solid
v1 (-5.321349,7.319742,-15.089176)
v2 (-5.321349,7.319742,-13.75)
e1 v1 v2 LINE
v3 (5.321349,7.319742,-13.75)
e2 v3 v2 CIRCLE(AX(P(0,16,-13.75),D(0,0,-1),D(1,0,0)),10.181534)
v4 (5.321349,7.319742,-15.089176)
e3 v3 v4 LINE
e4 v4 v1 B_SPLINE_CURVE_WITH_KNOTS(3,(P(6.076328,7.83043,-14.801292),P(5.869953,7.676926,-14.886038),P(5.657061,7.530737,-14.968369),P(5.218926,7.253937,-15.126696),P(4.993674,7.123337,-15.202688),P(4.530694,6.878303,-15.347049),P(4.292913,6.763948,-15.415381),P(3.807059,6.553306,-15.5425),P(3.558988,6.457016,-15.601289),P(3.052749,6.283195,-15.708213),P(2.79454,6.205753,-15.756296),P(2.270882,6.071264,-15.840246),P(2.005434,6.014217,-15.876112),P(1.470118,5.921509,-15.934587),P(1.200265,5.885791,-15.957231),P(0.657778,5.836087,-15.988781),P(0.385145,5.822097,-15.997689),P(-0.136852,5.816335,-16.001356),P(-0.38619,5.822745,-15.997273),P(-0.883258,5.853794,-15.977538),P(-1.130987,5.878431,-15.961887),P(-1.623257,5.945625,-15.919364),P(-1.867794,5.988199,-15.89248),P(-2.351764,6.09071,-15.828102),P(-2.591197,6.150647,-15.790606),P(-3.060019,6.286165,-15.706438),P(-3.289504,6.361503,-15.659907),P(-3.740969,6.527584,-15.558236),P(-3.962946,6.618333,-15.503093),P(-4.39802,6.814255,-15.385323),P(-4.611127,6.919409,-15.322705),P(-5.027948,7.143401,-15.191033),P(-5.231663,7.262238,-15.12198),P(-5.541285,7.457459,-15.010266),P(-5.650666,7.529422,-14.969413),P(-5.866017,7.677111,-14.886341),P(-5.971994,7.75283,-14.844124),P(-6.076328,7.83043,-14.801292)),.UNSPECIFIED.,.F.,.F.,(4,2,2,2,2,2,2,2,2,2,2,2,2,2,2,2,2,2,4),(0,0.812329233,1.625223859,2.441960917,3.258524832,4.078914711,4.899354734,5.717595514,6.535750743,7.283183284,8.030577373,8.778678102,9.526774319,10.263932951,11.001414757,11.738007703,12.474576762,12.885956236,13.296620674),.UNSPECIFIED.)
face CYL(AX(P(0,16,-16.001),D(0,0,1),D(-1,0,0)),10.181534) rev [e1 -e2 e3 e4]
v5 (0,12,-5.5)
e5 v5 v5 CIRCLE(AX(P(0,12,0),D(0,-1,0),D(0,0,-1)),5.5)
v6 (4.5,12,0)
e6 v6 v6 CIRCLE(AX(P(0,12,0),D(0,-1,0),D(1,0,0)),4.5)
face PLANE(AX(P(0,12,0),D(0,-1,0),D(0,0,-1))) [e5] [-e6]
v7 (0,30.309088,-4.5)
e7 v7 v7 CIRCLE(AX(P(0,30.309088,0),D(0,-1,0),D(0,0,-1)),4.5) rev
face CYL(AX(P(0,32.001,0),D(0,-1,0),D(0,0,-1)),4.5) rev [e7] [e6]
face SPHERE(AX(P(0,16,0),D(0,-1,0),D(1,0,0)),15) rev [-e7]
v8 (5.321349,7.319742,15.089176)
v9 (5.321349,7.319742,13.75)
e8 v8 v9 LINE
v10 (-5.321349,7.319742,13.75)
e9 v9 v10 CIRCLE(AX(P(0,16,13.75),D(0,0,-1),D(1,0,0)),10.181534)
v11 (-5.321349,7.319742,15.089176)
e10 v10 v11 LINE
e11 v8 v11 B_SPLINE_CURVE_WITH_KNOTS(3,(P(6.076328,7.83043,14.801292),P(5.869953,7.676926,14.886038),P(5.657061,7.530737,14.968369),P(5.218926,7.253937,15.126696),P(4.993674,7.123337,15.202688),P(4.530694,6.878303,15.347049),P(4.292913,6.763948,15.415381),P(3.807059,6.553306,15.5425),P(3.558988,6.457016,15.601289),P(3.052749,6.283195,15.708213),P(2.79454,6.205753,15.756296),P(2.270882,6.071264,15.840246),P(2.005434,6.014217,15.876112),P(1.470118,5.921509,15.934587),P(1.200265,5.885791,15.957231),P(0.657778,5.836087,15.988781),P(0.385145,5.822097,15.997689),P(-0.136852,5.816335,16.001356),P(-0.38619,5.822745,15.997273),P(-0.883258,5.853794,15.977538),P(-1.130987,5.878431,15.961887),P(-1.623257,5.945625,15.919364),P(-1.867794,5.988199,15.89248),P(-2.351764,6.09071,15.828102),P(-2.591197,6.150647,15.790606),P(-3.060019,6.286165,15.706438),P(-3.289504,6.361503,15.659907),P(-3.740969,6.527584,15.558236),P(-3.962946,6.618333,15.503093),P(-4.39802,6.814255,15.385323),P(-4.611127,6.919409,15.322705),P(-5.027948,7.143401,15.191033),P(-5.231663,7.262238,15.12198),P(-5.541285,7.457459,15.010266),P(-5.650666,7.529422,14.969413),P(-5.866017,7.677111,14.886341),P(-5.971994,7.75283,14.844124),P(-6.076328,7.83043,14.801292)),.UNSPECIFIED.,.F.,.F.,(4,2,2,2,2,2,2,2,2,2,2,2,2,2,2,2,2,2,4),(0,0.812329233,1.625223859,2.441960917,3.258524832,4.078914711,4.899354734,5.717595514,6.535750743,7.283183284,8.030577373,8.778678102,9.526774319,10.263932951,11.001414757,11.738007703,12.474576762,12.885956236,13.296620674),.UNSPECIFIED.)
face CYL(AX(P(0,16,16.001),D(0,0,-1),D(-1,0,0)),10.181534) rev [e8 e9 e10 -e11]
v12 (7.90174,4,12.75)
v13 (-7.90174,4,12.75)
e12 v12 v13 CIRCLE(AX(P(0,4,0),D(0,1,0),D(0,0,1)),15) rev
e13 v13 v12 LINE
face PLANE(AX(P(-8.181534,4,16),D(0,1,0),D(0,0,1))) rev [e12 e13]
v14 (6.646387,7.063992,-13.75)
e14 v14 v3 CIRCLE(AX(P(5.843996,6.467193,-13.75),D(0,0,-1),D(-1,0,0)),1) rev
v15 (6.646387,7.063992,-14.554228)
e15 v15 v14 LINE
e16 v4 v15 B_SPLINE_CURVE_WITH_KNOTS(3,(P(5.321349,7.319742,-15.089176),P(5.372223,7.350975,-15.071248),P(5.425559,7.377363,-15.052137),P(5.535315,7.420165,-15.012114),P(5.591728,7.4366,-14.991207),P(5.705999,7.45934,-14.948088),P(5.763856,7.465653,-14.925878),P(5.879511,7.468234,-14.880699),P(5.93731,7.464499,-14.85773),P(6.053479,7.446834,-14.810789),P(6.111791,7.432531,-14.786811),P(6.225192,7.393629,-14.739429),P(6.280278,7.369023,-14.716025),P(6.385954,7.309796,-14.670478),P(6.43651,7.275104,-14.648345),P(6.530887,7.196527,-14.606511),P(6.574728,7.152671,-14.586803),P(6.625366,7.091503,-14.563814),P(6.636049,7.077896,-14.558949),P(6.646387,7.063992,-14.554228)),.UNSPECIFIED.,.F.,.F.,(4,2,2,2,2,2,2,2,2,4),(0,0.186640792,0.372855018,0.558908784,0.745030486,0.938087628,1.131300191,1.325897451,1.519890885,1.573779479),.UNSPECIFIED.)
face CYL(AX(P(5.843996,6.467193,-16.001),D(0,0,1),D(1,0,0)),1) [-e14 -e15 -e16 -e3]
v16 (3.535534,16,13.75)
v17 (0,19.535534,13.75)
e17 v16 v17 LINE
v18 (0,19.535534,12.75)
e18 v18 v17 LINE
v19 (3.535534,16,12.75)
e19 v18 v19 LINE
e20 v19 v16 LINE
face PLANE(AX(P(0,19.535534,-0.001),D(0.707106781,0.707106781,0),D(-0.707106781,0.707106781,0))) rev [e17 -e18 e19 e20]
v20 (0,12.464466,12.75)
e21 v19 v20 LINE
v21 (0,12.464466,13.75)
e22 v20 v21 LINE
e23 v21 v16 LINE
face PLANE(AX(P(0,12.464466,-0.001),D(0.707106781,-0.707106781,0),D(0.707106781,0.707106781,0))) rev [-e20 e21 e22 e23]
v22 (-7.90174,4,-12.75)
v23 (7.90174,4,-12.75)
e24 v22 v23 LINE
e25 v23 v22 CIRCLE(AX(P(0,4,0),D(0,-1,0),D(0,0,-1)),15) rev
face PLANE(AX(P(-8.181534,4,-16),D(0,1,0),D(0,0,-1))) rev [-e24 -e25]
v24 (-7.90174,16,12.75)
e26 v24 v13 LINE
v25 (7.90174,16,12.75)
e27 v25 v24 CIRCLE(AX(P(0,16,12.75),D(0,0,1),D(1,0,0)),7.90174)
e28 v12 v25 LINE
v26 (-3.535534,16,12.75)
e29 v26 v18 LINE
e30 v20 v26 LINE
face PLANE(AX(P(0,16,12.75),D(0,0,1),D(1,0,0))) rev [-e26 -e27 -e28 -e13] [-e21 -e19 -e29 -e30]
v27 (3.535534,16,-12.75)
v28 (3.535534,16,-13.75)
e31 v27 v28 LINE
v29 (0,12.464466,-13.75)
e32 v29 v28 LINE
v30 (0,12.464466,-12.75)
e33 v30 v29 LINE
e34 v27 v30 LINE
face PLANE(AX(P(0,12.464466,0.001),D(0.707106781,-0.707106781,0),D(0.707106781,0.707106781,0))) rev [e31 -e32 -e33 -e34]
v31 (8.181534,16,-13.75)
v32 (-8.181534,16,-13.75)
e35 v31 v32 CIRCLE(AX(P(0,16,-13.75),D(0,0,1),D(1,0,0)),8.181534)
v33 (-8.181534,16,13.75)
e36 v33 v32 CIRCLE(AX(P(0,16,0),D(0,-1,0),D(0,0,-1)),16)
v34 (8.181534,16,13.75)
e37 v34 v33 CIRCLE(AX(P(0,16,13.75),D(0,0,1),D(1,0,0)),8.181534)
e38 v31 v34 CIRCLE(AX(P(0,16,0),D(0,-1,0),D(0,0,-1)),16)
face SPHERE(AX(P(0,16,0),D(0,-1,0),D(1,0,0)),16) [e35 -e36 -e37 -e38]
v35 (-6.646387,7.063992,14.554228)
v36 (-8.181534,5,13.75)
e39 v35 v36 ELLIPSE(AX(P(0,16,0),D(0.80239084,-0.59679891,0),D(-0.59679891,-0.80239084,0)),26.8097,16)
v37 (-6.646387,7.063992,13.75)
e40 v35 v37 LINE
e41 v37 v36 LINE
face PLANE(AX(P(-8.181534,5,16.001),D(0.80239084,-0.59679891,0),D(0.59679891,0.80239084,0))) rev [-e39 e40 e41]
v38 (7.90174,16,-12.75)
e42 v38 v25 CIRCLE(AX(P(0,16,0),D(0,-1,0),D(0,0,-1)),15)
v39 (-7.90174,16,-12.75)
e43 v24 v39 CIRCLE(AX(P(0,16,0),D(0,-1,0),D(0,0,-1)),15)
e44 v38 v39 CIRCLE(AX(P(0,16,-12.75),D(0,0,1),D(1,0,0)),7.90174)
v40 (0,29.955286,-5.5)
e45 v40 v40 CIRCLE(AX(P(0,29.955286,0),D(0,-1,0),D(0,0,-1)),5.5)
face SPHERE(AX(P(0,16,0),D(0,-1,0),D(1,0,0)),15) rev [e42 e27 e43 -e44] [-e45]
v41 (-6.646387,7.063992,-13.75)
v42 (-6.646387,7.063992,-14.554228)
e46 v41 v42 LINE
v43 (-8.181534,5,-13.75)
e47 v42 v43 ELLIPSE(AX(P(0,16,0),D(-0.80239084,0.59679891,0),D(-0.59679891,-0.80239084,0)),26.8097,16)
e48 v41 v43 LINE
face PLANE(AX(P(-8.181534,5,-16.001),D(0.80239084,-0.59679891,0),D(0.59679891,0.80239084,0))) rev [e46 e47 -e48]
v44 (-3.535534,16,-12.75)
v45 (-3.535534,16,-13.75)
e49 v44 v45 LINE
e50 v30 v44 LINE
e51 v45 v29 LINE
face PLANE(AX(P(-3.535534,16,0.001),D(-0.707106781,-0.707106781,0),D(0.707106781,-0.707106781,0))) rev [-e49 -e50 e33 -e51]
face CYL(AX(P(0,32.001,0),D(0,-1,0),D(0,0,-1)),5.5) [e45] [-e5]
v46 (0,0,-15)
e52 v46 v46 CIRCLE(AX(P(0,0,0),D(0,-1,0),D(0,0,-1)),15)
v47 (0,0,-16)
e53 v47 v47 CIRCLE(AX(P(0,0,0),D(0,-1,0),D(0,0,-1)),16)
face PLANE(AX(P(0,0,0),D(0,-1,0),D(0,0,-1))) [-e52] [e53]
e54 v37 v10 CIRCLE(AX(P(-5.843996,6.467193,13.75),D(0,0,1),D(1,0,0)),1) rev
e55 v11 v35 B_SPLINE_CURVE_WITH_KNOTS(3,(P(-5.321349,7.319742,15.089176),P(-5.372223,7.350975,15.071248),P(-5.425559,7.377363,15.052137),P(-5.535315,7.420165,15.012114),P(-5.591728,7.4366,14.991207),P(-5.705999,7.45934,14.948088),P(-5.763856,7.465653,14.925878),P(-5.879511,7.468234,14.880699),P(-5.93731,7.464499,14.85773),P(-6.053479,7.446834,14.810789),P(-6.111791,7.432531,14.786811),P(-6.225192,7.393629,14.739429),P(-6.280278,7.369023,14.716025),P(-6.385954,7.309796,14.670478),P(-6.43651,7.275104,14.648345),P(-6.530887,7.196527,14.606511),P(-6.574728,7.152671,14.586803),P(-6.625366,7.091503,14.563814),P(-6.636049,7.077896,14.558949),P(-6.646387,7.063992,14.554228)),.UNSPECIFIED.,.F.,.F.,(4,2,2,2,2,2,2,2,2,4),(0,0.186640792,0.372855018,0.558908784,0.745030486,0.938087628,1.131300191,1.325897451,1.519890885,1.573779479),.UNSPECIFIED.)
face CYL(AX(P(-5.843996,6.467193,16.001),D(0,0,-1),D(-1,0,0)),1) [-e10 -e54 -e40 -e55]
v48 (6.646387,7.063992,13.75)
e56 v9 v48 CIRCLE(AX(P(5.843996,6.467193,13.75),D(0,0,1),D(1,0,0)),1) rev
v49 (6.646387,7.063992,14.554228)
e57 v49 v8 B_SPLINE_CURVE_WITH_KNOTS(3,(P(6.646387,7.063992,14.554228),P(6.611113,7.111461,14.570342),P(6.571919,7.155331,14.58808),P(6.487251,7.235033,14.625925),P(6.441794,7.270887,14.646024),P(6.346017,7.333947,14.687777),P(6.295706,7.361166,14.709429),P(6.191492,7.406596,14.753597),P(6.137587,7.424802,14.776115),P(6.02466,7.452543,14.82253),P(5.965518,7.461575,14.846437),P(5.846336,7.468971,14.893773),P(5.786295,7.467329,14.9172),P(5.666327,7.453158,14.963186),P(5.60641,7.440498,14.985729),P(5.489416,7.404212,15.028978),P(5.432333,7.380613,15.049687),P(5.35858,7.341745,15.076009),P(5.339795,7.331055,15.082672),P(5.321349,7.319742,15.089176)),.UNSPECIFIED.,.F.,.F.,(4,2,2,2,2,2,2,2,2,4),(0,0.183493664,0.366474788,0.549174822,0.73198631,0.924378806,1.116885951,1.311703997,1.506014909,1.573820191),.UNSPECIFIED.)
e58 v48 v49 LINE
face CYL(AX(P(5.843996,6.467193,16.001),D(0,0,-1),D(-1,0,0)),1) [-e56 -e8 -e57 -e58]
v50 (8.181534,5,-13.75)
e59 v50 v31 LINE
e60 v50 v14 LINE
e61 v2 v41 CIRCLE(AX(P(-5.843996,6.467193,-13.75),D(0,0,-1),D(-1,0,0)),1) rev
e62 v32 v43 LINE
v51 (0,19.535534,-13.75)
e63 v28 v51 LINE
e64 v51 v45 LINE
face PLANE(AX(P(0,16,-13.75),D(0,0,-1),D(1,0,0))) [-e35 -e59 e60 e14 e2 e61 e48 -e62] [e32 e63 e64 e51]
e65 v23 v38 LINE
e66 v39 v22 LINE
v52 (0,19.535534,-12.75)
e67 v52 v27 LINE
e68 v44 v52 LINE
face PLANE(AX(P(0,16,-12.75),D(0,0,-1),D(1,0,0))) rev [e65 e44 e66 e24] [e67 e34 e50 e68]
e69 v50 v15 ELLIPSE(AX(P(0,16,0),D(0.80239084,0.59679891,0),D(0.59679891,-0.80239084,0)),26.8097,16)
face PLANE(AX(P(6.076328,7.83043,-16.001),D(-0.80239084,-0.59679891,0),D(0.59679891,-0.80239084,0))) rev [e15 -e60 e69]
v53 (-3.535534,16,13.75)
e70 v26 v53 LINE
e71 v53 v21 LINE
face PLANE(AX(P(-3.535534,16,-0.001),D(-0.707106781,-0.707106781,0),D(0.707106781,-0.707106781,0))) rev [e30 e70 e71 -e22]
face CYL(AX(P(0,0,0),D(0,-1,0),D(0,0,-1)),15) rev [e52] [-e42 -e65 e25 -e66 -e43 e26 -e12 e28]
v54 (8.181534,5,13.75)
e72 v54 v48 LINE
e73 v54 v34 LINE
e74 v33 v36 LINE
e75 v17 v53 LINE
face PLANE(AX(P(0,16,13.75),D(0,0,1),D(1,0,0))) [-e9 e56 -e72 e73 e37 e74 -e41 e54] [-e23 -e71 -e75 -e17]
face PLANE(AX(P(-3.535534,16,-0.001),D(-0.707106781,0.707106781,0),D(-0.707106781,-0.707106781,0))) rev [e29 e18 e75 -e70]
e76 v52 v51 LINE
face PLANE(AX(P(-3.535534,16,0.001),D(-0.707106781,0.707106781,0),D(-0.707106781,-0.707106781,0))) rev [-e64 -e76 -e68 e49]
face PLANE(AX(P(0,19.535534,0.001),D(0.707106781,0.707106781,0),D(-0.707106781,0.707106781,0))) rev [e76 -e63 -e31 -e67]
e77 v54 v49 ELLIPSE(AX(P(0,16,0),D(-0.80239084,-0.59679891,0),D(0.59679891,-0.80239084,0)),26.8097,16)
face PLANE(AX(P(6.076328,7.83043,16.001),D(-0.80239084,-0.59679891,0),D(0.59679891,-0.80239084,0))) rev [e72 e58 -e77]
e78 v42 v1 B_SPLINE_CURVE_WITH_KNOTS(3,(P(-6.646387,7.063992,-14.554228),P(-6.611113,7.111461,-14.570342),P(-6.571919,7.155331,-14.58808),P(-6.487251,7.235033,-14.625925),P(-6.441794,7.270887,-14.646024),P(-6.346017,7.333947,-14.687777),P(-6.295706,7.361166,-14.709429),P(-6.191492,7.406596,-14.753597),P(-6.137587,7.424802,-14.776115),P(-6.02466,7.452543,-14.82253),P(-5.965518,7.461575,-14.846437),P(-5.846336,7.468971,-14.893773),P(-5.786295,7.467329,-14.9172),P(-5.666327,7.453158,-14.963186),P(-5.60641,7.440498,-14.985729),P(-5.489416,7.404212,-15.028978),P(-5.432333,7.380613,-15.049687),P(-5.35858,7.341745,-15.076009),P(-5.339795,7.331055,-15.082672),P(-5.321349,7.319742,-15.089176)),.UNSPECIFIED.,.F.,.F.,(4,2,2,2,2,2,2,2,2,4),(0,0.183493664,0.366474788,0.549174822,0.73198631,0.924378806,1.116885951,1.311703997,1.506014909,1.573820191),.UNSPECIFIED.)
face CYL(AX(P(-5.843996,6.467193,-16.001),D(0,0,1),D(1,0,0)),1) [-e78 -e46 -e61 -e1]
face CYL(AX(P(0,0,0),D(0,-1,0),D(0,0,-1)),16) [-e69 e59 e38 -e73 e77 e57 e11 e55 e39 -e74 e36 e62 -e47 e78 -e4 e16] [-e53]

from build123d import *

# Parameters (mm, degrees)
REVOLVE1_ANGLE           = 180
CUT_EXTRUDE1_DEPTH       = 39.328351126
SHELL1_DEPTH             = 16
SHELL1_2_DEPTH           = 4
EXTRUDE1_REACH           = 40.328
EXTRUDE1_END_RADIUS      = 16
CUT_EXTRUDE2_REACH       = 40.328
EXTRUDE_THIN1_REACH      = 53.192
EXTRUDE_THIN1_END_RADIUS = 15
EXTRUDE_THIN1_START      = -12
SKETCH5_R                = 5.5
SKETCH5_R_2              = 4.5
FILLET_1_R               = 1


with BuildPart() as part:
    # Sketch1 → Revolve1 (revolve)
    with BuildSketch(Plane(origin=(0, 0, 0), x_dir=(-1, 0, 0), z_dir=(0, 0, -1))):
        with BuildLine():
            Line((0, 0), (16, 0))
            Line((16, 0), (16, 16))
            ThreePointArc((16, 16), (11.313708499, 27.313708499), (0, 32))
            Line((0, 32), (0, 0))
        make_face()
    revolve(axis=Axis((0, 0, 0), (0, 1, 0)), revolution_arc=REVOLVE1_ANGLE)

    # Sketch2 → Cut-Extrude1 (cut, through all)
    with BuildSketch(Plane.XY.offset(13.75)):
        with BuildLine():
            Line((8.181534086, 5), (8.181534086, 16))
            ThreePointArc((8.181534086, 16), (0, 24.181534086), (-8.181534086, 16))
            Line((-8.181534086, 16), (-8.181534086, 5))
            Line((-8.181534086, 5), (8.181534086, 5))
        make_face()
    extrude(amount=CUT_EXTRUDE1_DEPTH, mode=Mode.SUBTRACT)

    # Shell1: read off the stored shape, not the designer's step
    # Shell1 outline → Shell1 (cut)
    with BuildSketch(Plane(origin=(0, 0, 0), x_dir=(1, 0, 0), z_dir=(0, 1, 0))):
        with BuildLine():
            ThreePointArc((7.901740315, -12.75), (13.105840391, -7.296365372), (15, 0))
            Line((15, 0), (-15, 0))
            ThreePointArc((-15, 0), (-13.105840391, -7.296365372), (-7.901740315, -12.75))
            Line((-7.901740315, -12.75), (7.901740315, -12.75))
        make_face()
    extrude(amount=SHELL1_DEPTH, mode=Mode.SUBTRACT)

    # Shell1 2 outline → Shell1 2 (cut)
    with BuildSketch(Plane(origin=(0, 0, 0), x_dir=(1, 0, 0), z_dir=(0, 1, 0))):
        with BuildLine():
            ThreePointArc((-7.901740315, -12.75), (0, -15), (7.901740315, -12.75))
            Line((7.901740315, -12.75), (-7.901740315, -12.75))
        make_face()
    extrude(amount=SHELL1_2_DEPTH, mode=Mode.SUBTRACT)

    # Shell1 3 outline → Shell1 3 (revolve, cut)
    with BuildSketch(Plane.XZ.offset(-16)):
        with BuildLine():
            ThreePointArc((15, 0), (13.105840391, 7.296365372), (7.901740315, 12.75))
            Line((7.901740315, 12.75), (0, 12.75))
            Line((0, 12.75), (0, 0))
            Line((0, 0), (15, 0))
        make_face()
    revolve(axis=Axis((0, 16, 0), (0, 0, 1)), mode=Mode.SUBTRACT)

    # Extrude1: up to this cylinder (the profile starts inside it)
    extrude1_end = Plane(origin=(0, 6.31611, 0), z_dir=(0, -1, 0)) * Cylinder(EXTRUDE1_END_RADIUS, 113.656, mode=Mode.PRIVATE)
    # Sketch3 → Extrude1 (add, up to the surface)
    with BuildSketch(Plane.XY.offset(13.75), mode=Mode.PRIVATE) as extrude1_sk1:
        with BuildLine():
            Line((6.076328446, 7.830430308), (8.181534086, 5))
            Line((8.181534086, 5), (-8.181534086, 5))
            Line((-8.181534086, 5), (-6.076328446, 7.830430308))
            ThreePointArc((-6.076328446, 7.830430308), (0, 5.818465914), (6.076328446, 7.830430308))
        make_face()
    extrude1_tool1 = extrude(extrude1_sk1.sketch, amount=EXTRUDE1_REACH, mode=Mode.PRIVATE) & extrude1_end
    add(extrude1_tool1.solids().sort_by_distance((6.995686, 6.31611, 13.75))[0])

    # Sketch4 → Cut-Extrude2 (cut, up to next)
    with BuildSketch(Plane.XY.offset(13.75), mode=Mode.PRIVATE) as cut_extrude2_sk1:
        Polygon((-3.535533906, 16), (0, 12.464466094), (3.535533906, 16), (0, 19.535533906), align=None)
    cut_extrude2_tool1 = extrude(cut_extrude2_sk1.sketch, amount=-CUT_EXTRUDE2_REACH, mode=Mode.PRIVATE) & part.part
    add(cut_extrude2_tool1.solids().sort_by_distance((0, 16, 13.75))[0], mode=Mode.SUBTRACT)

    # Mirror1: part across face


with BuildPart() as part_1:
    add(part.part)
    add(part.part.mirror(Plane(origin=(0, 18.784156894, 0), x_dir=(1, 0, 0), z_dir=(0, 0, -1))))

    # Extrude-Thin1: up to this sphere (the profile starts inside it)
    extrude_thin1_end = Location((0, 16, 0)) * Sphere(EXTRUDE_THIN1_END_RADIUS, mode=Mode.PRIVATE)
    # Sketch5 → Extrude-Thin1 (add, up to the surface)
    with BuildSketch(Plane.XZ.offset(EXTRUDE_THIN1_START), mode=Mode.PRIVATE) as extrude_thin1_sk1:
        Circle(SKETCH5_R)
        Circle(SKETCH5_R_2, mode=Mode.SUBTRACT)
    extrude_thin1_tool1 = extrude(extrude_thin1_sk1.sketch, amount=-EXTRUDE_THIN1_REACH, mode=Mode.PRIVATE) & extrude_thin1_end
    add(extrude_thin1_tool1.solids().sort_by_distance((-5.344437, 12, 0))[0])

    # 圓角1
    fillet_1_edges = [part_1.edges().sort_by_distance(p)[0] for p in [
        (6.076328446, 7.830430308, 14.275645793),
        (-6.076328446, 7.830430308, 14.275645793),
        (-6.076328446, 7.830430308, -14.275645793),
        (6.076328446, 7.830430308, -14.275645793),
    ]]
    fillet(fillet_1_edges, radius=FILLET_1_R)


solid = part_1.part
